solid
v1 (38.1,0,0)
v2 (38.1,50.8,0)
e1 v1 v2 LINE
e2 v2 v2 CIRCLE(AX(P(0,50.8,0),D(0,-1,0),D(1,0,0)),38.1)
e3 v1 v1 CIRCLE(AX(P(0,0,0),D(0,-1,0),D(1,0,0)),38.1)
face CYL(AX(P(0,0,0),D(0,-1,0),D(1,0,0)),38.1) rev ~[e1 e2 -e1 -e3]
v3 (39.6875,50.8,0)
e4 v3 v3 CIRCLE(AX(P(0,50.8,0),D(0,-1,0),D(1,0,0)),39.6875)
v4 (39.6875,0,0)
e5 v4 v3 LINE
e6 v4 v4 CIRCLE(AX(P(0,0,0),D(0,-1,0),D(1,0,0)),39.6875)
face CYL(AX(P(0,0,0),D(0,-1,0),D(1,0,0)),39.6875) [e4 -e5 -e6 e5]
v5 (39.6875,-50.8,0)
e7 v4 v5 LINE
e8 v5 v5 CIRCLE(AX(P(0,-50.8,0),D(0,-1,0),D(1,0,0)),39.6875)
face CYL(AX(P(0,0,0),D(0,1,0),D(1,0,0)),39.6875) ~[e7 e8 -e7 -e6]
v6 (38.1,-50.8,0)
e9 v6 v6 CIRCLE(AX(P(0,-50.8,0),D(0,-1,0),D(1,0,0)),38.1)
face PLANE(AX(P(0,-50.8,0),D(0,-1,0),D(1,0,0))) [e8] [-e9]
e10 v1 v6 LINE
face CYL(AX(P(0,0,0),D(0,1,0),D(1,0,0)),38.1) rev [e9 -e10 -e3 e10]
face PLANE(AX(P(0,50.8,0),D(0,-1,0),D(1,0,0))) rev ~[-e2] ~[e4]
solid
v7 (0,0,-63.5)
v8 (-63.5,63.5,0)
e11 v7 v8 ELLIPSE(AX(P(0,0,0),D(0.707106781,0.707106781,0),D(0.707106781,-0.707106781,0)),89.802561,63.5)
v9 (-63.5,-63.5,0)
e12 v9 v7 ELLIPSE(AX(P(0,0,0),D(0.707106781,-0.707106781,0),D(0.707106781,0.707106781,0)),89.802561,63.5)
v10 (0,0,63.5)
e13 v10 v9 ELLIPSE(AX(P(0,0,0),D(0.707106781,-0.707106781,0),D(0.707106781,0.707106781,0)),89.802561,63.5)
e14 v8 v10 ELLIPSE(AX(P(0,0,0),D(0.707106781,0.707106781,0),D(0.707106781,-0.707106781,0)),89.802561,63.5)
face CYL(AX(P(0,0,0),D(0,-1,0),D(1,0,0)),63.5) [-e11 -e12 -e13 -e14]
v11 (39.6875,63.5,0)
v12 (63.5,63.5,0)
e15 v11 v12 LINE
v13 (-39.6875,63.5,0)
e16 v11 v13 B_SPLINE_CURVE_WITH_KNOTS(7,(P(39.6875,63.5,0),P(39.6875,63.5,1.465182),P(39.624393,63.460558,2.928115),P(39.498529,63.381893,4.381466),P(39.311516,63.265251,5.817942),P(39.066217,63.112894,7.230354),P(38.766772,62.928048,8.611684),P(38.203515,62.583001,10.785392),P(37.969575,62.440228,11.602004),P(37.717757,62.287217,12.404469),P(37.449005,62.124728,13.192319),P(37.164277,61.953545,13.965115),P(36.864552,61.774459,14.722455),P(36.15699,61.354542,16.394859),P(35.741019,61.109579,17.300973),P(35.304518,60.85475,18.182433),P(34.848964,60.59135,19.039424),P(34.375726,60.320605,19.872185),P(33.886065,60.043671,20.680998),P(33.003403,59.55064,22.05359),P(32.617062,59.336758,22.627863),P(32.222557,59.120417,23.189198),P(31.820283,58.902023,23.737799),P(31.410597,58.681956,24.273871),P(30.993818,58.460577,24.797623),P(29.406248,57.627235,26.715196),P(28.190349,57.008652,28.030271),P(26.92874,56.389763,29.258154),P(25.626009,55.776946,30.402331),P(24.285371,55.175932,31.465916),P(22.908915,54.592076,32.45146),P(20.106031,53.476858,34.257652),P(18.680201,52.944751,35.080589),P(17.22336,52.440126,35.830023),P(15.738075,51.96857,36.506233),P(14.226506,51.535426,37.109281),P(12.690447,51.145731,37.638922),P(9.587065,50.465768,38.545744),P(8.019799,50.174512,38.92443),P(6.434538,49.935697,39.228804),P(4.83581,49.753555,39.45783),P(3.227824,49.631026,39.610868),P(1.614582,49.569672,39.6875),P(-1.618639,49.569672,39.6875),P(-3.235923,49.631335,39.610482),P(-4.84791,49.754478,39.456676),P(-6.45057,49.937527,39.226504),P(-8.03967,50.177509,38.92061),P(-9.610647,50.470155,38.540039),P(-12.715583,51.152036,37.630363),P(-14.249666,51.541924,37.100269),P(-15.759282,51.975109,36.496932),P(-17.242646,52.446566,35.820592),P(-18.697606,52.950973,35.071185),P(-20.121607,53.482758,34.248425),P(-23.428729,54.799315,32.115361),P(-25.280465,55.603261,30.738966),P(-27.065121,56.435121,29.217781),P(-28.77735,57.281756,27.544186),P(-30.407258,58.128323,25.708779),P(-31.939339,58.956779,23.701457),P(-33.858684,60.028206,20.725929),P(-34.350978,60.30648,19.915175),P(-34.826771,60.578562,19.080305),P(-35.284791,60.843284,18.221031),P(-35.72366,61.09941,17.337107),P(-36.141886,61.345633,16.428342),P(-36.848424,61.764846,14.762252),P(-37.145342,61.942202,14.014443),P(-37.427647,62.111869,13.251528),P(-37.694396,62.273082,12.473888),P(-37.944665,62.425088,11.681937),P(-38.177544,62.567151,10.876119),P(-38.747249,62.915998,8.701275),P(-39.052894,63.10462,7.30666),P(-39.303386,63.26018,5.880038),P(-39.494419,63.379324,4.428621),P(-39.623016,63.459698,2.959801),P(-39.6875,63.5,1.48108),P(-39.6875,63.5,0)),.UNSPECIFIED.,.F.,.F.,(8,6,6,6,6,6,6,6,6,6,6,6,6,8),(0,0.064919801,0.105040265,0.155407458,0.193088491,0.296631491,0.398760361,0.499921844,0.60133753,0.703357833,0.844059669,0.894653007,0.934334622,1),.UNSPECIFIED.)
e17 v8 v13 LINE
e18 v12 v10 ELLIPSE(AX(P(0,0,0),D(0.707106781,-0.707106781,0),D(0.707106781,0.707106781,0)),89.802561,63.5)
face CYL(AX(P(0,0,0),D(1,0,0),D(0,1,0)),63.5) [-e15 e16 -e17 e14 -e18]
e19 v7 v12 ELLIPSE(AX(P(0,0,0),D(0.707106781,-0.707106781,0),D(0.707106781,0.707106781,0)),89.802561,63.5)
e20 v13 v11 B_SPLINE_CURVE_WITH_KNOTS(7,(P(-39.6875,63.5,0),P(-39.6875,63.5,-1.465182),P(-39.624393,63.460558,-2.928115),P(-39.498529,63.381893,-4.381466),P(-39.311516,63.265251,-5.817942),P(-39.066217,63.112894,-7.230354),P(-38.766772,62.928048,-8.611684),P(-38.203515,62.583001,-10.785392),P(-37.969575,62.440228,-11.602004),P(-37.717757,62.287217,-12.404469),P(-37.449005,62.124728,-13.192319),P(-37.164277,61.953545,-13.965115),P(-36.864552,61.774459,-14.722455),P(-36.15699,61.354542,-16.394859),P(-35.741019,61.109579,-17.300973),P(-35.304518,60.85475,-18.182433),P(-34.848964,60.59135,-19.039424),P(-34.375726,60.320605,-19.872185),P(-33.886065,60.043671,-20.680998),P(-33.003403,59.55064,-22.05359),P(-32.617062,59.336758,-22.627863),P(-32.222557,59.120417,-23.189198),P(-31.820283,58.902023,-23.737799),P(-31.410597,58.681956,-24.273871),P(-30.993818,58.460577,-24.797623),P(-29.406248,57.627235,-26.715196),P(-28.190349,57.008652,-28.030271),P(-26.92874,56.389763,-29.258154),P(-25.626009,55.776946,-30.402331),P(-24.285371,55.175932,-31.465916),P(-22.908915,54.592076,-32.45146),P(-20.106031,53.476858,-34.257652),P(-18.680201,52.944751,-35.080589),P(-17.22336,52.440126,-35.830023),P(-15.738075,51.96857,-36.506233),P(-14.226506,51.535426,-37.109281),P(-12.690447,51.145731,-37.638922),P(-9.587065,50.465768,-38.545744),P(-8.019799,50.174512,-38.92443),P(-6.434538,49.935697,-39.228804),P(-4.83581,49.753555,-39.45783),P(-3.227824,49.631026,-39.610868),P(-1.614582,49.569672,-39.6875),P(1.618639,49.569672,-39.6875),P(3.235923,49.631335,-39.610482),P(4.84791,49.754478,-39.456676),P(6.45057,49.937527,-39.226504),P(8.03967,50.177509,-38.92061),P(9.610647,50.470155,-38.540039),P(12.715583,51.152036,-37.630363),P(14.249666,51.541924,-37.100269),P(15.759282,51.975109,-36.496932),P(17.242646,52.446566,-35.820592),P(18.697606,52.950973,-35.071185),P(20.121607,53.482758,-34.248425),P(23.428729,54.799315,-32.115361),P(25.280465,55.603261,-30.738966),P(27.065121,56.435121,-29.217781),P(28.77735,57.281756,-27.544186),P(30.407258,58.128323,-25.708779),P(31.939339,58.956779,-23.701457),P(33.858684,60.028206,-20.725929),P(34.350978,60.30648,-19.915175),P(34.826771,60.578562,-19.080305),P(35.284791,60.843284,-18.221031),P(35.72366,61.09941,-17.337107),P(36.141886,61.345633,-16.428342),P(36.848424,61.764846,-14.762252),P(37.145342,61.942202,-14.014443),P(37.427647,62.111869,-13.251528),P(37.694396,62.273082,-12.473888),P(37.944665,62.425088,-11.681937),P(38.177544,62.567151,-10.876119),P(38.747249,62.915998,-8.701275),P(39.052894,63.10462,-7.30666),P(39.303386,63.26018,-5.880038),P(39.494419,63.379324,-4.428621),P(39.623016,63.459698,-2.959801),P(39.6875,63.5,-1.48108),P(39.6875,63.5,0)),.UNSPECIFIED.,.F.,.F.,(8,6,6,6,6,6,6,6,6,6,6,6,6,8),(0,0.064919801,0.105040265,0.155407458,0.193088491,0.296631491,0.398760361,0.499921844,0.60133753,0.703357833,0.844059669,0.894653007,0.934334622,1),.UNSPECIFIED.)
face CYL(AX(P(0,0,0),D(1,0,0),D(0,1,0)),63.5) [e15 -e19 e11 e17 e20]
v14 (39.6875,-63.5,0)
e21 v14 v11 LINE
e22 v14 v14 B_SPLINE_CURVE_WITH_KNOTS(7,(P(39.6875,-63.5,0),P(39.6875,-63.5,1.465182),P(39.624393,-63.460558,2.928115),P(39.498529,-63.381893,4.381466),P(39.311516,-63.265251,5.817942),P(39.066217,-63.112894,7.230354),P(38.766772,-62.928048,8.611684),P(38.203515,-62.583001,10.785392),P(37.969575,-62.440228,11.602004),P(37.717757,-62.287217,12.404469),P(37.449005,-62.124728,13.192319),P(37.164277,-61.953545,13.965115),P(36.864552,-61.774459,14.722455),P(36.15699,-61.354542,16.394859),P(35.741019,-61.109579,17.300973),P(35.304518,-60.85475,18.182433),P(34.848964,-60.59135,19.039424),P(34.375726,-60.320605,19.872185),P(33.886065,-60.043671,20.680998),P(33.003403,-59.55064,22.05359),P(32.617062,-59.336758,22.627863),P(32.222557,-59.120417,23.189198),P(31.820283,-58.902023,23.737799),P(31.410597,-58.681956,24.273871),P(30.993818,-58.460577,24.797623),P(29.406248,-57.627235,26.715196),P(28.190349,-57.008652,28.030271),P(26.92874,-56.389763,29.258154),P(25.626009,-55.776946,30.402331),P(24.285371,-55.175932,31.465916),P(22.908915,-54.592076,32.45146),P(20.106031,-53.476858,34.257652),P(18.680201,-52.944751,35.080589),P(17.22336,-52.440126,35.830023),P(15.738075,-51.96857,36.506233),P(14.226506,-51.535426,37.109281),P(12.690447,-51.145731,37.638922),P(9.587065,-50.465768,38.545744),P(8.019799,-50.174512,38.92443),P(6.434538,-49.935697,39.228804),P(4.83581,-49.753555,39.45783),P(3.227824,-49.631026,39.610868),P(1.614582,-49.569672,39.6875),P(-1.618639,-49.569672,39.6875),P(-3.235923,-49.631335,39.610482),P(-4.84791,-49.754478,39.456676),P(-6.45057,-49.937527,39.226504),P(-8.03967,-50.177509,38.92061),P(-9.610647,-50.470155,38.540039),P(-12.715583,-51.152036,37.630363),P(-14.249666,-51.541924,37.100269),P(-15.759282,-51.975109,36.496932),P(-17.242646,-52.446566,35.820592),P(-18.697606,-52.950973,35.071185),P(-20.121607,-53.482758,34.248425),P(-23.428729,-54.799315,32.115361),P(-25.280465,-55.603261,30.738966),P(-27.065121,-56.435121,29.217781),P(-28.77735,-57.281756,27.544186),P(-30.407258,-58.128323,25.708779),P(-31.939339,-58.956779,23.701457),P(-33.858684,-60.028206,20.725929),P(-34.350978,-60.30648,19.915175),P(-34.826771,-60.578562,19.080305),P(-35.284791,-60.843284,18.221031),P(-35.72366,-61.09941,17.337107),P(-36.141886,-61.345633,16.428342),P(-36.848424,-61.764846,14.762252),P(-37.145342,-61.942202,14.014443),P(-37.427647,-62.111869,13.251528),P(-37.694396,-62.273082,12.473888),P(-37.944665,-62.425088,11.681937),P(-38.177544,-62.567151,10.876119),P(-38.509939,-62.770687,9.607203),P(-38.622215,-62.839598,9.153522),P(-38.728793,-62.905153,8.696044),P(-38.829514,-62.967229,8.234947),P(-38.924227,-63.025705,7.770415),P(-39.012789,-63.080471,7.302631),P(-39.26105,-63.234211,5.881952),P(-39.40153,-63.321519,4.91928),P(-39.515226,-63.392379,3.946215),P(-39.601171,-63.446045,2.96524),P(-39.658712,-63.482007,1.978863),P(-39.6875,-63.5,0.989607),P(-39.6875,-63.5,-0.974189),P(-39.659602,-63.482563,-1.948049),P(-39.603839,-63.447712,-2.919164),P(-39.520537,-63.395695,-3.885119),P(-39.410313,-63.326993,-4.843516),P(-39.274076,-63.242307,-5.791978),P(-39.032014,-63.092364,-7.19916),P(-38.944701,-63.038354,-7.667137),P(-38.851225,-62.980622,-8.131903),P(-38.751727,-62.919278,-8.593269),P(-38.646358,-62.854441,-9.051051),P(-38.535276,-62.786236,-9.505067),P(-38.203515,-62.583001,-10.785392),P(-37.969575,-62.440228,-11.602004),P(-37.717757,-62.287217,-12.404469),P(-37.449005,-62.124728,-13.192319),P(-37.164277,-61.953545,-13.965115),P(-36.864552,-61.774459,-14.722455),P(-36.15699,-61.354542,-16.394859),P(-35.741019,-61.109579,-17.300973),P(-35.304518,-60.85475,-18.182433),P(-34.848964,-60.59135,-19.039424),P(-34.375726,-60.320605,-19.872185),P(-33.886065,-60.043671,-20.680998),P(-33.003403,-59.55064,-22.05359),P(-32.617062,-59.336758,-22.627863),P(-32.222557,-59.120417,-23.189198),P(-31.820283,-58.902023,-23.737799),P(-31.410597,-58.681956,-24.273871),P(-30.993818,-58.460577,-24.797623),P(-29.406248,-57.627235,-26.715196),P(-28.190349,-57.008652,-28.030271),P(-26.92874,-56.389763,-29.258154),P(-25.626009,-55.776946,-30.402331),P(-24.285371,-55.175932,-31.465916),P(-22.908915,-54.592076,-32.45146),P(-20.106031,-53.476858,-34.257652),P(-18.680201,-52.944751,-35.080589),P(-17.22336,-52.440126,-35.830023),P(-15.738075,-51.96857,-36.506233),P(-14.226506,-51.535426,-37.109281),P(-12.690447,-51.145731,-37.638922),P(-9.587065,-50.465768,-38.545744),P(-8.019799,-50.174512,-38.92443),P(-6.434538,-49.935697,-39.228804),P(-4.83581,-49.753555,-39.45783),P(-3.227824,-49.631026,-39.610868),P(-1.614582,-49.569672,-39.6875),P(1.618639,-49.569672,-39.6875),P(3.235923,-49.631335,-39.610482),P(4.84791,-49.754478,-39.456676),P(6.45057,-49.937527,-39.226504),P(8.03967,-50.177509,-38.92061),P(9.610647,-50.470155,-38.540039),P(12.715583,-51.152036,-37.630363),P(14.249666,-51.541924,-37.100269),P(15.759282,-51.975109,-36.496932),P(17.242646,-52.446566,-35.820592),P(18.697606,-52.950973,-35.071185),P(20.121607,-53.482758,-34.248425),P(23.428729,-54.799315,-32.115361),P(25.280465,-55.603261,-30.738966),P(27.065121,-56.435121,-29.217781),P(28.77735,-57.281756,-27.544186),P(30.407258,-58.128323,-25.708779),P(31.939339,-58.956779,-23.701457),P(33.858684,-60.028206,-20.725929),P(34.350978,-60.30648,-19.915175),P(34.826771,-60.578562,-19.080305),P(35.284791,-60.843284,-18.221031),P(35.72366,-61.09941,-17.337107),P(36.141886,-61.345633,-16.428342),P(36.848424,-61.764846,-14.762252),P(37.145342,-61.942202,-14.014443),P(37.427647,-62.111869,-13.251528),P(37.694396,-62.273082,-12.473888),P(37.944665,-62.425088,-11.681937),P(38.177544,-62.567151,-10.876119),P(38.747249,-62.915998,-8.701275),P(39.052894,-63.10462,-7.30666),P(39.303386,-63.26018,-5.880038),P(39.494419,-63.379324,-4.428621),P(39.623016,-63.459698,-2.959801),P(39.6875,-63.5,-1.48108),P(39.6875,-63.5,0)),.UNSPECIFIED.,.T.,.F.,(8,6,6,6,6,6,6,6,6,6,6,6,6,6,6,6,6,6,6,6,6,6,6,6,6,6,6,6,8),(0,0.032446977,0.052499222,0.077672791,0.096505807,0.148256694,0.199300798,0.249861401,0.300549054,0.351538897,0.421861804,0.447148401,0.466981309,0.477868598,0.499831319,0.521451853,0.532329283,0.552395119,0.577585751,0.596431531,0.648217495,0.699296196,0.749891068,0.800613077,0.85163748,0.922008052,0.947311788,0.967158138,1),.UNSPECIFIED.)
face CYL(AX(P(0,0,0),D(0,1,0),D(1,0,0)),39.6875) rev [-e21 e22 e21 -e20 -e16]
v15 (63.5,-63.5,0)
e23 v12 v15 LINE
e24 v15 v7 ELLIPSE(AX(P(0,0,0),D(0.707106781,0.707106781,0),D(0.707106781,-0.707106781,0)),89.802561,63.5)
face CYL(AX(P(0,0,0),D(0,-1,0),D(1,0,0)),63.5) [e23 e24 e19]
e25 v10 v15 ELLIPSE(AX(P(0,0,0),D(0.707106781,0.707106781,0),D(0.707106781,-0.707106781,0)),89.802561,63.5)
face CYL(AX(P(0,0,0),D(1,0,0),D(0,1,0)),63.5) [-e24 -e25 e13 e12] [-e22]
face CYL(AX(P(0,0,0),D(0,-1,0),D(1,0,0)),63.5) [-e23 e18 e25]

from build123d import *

# Parameters (mm, degrees)
F0_R          = 39.6875
F0_R_2        = 38.1
F2_DEPTH      = 50.8
F2_DEPTH_BACK = 50.8
F1_R          = 63.5
F1_R_2        = 26.9875
F1_R_3        = 25.4
F3_DEPTH      = 63.5
F3_DEPTH_BACK = 63.5
F0_R_3        = 63.5
F6_DEPTH      = 63.5


# Not quite as in the source:
# - a feature of the source that left no trace in its solid (it failed there, or was rolled back) is left out


with BuildPart() as f2:
    # F0 (on Front) → F2 (new body, two sides)
    with BuildSketch(Plane.XZ) as f2_sk:
        Circle(F0_R)
        Circle(F0_R_2, mode=Mode.SUBTRACT)
    extrude(amount=-F2_DEPTH)
    extrude(f2_sk.sketch, amount=F2_DEPTH_BACK)


with BuildPart() as f3:
    # F1 (on Right) → F3 (new body, two sides)
    with BuildSketch(Plane.YZ) as f3_sk:
        Circle(F1_R)
        Circle(F1_R_2, mode=Mode.SUBTRACT)
        Circle(F1_R_2)
        Circle(F1_R_3, mode=Mode.SUBTRACT)
        Circle(F1_R_3)
    extrude(amount=F3_DEPTH)
    extrude(f3_sk.sketch, amount=-F3_DEPTH_BACK)

    # F0 (on Front) → F6 (intersect, symmetric)
    with BuildSketch(Plane.XZ):
        Circle(F0_R_3)
        Circle(F0_R, mode=Mode.SUBTRACT)
    extrude(amount=F6_DEPTH, both=True, mode=Mode.INTERSECT)


solid = Compound([f2.part, f3.part])
